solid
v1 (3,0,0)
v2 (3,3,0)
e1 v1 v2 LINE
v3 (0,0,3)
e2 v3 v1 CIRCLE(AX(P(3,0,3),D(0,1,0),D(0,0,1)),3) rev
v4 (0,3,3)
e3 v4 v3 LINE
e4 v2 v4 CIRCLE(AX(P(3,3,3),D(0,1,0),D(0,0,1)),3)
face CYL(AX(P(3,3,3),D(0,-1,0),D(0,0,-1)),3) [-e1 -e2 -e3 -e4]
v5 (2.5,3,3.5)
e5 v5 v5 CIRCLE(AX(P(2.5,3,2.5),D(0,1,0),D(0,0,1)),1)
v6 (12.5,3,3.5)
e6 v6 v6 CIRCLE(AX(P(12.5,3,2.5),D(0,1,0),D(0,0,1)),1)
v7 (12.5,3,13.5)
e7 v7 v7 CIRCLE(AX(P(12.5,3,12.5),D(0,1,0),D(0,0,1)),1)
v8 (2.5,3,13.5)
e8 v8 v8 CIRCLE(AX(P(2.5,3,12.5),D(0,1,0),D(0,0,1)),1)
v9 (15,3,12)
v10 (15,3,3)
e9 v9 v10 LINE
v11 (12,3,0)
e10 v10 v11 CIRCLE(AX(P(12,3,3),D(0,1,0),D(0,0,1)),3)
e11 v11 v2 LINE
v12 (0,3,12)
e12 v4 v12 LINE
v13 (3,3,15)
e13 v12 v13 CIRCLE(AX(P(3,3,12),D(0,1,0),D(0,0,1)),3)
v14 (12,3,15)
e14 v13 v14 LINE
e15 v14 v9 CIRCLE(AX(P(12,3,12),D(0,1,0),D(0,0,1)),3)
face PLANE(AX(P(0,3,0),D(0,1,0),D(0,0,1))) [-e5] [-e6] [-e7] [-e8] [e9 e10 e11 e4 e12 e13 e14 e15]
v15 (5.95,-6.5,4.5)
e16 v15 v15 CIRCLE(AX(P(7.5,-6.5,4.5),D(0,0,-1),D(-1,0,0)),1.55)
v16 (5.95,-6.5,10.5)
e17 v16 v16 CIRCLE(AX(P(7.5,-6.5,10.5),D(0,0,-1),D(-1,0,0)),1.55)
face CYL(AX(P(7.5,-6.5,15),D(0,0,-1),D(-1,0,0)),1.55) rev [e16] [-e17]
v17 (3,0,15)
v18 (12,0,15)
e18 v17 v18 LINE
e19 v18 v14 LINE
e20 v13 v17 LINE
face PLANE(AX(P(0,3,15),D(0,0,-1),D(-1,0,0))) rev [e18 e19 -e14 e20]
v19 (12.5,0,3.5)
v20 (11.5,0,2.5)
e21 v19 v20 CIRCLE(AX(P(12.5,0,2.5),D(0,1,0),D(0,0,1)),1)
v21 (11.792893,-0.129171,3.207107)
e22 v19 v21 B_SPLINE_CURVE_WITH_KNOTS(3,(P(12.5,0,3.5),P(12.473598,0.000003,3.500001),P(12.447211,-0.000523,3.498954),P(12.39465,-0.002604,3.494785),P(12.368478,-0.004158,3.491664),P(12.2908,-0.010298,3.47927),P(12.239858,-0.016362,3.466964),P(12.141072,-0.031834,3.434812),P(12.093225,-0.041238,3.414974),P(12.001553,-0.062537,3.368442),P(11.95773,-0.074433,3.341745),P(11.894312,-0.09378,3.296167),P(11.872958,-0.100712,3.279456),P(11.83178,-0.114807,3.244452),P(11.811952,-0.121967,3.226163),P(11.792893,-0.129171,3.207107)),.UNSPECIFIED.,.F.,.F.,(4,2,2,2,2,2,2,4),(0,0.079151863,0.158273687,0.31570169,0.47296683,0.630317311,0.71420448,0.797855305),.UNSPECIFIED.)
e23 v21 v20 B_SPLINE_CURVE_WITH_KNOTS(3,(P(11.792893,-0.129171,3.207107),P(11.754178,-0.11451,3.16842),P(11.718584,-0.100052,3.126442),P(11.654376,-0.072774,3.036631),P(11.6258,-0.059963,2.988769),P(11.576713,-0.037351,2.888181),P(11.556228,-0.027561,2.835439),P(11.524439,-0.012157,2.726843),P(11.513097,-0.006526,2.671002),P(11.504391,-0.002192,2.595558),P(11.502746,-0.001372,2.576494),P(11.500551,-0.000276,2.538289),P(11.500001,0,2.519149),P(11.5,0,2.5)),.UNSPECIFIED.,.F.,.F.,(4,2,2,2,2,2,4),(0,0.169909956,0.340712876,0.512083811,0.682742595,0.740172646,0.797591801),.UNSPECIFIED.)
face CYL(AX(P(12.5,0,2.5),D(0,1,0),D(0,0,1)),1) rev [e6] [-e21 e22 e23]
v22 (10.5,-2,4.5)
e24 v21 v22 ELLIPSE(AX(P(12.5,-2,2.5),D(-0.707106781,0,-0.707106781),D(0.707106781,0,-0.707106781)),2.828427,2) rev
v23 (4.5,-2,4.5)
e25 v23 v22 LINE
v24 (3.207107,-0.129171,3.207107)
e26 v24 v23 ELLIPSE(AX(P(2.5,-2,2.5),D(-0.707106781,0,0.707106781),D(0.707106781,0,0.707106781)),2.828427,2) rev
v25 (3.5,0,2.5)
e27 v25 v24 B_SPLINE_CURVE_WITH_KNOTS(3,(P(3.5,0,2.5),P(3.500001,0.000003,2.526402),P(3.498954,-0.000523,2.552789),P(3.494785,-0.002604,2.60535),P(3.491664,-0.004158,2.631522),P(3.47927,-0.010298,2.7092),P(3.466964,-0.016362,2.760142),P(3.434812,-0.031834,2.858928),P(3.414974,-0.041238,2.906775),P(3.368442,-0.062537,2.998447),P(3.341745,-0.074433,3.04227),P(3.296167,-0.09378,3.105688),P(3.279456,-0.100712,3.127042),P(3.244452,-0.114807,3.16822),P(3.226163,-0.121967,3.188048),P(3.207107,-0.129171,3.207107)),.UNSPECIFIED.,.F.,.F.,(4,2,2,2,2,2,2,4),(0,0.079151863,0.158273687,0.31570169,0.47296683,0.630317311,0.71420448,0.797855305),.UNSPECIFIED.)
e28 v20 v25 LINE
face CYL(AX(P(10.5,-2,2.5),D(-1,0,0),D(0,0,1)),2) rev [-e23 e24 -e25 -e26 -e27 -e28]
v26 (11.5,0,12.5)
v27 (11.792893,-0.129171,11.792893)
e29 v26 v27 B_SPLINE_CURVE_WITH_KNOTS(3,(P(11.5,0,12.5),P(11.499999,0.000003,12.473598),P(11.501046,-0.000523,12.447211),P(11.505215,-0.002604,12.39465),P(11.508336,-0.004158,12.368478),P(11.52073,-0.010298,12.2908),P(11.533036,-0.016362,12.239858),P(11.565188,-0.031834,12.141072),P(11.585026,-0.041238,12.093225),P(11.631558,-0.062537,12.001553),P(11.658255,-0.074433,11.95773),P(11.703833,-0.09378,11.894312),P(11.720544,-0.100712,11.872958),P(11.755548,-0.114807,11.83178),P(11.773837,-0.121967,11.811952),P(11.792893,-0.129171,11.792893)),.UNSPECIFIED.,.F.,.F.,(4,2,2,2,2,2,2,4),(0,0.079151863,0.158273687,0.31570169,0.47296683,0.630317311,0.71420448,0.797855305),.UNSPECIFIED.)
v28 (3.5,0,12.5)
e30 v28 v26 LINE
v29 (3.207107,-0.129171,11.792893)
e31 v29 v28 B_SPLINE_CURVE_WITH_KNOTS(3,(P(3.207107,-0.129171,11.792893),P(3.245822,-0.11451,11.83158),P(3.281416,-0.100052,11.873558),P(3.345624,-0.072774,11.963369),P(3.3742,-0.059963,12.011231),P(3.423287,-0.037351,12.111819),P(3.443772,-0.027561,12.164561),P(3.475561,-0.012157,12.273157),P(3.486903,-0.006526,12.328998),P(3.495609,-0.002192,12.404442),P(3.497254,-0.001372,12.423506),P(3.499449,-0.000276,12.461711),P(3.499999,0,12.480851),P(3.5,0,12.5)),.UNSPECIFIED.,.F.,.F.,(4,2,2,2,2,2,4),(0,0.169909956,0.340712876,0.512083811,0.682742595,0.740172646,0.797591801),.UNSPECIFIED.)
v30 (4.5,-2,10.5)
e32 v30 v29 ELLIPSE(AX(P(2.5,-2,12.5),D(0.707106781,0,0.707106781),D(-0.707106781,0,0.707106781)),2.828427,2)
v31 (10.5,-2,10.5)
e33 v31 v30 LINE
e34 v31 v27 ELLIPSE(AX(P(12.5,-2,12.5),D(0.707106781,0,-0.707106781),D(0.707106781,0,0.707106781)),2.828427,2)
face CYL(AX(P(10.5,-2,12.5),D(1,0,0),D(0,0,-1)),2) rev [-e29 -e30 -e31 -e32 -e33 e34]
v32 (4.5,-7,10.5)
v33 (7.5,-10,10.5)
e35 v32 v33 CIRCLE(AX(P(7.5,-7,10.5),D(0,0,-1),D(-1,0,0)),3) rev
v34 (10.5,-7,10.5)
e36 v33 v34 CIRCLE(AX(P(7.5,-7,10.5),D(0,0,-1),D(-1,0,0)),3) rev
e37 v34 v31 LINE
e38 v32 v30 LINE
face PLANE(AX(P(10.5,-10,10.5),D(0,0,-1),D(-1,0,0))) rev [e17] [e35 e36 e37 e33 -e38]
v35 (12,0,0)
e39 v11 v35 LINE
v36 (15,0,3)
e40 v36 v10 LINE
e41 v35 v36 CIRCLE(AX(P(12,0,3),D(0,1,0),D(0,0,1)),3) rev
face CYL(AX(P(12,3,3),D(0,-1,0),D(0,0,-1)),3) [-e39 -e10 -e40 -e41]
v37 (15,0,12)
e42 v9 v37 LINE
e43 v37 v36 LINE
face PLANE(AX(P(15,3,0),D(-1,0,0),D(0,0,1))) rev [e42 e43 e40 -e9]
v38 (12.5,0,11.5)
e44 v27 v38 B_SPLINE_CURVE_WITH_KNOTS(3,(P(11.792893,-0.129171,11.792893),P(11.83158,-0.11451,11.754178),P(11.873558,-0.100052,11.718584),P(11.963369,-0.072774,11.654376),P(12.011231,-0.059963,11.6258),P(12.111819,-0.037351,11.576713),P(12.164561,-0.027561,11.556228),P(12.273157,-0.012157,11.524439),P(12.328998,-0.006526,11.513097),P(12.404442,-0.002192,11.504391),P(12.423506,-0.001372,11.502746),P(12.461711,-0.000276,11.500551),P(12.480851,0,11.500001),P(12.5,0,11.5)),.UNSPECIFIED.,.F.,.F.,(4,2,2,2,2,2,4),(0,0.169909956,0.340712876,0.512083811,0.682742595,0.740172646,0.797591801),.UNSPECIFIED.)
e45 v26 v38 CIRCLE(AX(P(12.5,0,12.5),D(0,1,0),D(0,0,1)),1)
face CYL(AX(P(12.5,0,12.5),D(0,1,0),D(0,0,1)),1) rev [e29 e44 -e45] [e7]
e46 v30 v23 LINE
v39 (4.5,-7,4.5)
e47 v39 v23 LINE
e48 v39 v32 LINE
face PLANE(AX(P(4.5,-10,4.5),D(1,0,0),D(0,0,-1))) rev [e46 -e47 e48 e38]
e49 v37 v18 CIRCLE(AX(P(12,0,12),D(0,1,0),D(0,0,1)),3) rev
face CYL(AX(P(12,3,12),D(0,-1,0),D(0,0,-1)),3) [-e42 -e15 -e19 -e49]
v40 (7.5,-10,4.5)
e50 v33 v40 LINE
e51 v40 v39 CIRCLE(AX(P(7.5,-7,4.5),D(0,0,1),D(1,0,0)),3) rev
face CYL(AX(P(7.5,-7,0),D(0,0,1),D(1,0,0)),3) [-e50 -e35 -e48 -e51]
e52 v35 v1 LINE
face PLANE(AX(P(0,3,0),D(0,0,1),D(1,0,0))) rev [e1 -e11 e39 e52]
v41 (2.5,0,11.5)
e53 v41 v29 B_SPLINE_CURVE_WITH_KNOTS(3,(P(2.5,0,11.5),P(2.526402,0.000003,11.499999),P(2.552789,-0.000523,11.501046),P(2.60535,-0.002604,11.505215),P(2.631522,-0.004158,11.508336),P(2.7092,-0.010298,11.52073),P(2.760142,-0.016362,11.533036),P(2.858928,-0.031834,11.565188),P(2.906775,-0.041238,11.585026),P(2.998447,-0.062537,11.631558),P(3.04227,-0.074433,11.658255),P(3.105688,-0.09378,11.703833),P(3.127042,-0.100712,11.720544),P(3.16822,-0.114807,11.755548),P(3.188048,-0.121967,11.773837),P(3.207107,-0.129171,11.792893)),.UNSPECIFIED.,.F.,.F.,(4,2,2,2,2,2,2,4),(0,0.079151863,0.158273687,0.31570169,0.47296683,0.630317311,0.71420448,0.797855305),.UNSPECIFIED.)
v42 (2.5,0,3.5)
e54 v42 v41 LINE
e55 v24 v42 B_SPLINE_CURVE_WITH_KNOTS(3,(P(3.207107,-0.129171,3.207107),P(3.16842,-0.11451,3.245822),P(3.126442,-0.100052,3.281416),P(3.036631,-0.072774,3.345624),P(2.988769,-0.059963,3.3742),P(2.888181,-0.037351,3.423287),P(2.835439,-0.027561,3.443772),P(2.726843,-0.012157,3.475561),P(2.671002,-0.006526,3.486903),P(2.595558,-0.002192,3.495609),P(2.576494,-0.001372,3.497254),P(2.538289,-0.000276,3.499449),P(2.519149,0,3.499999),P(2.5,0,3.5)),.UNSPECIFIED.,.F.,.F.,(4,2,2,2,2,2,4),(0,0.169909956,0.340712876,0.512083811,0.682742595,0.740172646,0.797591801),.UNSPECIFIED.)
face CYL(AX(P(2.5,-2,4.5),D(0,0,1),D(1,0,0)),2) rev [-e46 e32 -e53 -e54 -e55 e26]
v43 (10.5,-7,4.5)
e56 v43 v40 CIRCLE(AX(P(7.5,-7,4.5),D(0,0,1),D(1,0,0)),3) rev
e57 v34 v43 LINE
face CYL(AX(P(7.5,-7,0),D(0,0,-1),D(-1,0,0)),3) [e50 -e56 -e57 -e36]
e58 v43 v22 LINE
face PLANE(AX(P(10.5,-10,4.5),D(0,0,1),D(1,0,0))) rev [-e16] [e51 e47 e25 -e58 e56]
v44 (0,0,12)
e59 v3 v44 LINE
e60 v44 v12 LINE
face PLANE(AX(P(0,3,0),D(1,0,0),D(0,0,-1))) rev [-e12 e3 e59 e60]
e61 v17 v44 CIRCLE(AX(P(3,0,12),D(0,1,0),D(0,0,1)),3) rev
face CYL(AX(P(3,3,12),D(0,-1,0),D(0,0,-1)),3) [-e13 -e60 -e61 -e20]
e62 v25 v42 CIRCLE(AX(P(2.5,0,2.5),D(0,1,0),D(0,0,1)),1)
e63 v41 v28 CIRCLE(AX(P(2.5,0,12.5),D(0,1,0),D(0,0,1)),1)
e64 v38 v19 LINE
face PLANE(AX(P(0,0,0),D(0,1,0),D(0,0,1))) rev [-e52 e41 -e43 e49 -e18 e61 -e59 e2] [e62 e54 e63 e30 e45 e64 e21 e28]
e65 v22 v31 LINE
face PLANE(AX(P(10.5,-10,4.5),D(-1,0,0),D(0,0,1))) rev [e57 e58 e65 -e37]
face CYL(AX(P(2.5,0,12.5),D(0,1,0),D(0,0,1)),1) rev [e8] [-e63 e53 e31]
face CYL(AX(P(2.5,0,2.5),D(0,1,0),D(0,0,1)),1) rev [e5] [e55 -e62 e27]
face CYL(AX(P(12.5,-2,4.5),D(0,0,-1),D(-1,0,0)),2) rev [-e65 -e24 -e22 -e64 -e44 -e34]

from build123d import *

# Parameters (mm, degrees)
SKETCH1_W           = 15
SKETCH1_H           = 15
BOSS_EXTRUDE1_DEPTH = 3
SKETCH3_R           = 1
CUT_EXTRUDE1_DEPTH  = 22.424285286
FILLET1_R           = 3
SKETCH4_W           = 6
SKETCH4_H           = 6
BOSS_EXTRUDE2_DEPTH = 10
SKETCH5_R           = 1.55
CUT_EXTRUDE2_DEPTH  = 21.862646045
FILLET2_R           = 3
FILLET3_R           = 2


# Some blends are built 0.0001 mm under size
with BuildPart() as part:
    # Sketch1 → Boss-Extrude1 (new body)
    with BuildSketch(Plane(origin=(0, 0, 0), x_dir=(1, 0, 0), z_dir=(0, 1, 0))):
        with Locations((7.5, -7.5)):
            Rectangle(SKETCH1_W, SKETCH1_H)
    extrude(amount=BOSS_EXTRUDE1_DEPTH)

    # Sketch3 → Cut-Extrude1 (cut, through all)
    with BuildSketch(Plane(origin=(0, 3, 0), x_dir=(1, 0, 0), z_dir=(0, 1, 0))):
        with Locations(Location((2.5, -12.5, 0), (0, 0, 270))):
            Circle(SKETCH3_R)
        with Locations(Location((12.5, -12.5, 0), (0, 0, 270))):
            Circle(SKETCH3_R)
        with Locations(Location((12.5, -2.5, 0), (0, 0, 270))):
            Circle(SKETCH3_R)
        with Locations(Location((2.5, -2.5, 0), (0, 0, 270))):
            Circle(SKETCH3_R)
    extrude(amount=-CUT_EXTRUDE1_DEPTH, mode=Mode.SUBTRACT)

    # Fillet1
    fillet1_edges = [part.edges().sort_by_distance(p)[0] for p in [
        (0, 1.5, 0),
        (15, 1.5, 0),
        (15, 1.5, 15),
        (0, 1.5, 15),
    ]]
    fillet(fillet1_edges, radius=FILLET1_R)

    # Sketch4 → Boss-Extrude2 (add)
    with BuildSketch(Plane(origin=(0, 0, 0), x_dir=(-1, 0, 0), z_dir=(0, -1, 0))):
        with Locations((-7.5, -7.5)):
            Rectangle(SKETCH4_W, SKETCH4_H)
    extrude(amount=BOSS_EXTRUDE2_DEPTH)

    # Sketch5 → Cut-Extrude2 (cut, through all)
    with BuildSketch(Plane(origin=(0, 0, 4.5), x_dir=(-1, 0, 0), z_dir=(0, 0, -1))):
        with Locations((-7.5, -6.5)):
            Circle(SKETCH5_R)
    extrude(amount=-CUT_EXTRUDE2_DEPTH, mode=Mode.SUBTRACT)

    # Fillet2
    fillet2_edges = [part.edges().sort_by_distance(p)[0] for p in [
        (10.5, -10, 7.5),
        (4.5, -10, 7.5),
    ]]
    fillet(fillet2_edges, radius=FILLET2_R - 0.0001)  # a hair under: the kernel refuses the full size

    # Fillet3
    # the kernel refuses this fillet: 2 mm, written as the material it adds along each edge
    with BuildSketch(Plane(origin=(10.5, 0, 10.5), x_dir=(0, -1, 0), z_dir=(0, 0, -1)), Plane(origin=(4.5, 0, 10.5), x_dir=(0, -1, 0), z_dir=(1, 0, 0))) as fillet3_piece_1:
        with BuildLine():
            CenterArc((FILLET3_R, -FILLET3_R), FILLET3_R, 90, 90)
            Line((0, -FILLET3_R), (0, 0))
            Line((0, 0), (FILLET3_R, 0))
        make_face()
    extrude(amount=6)
    with BuildSketch(Plane(origin=(4.5, 0, 4.5), x_dir=(-1, 0, 0), z_dir=(0, 0, 1)), Plane(origin=(10.5, 0, 4.5), x_dir=(0, 0, -1), z_dir=(-1, 0, 0))) as fillet3_piece_2:
        with BuildLine():
            CenterArc((FILLET3_R, FILLET3_R), FILLET3_R, 180, 90)
            Line((0, FILLET3_R), (0, 0))
            Line((0, 0), (FILLET3_R, 0))
        make_face()
    extrude(amount=6)
    with BuildSketch(Plane(origin=(10.5, 0, 15.5), x_dir=(0, -1, 0), z_dir=(0, 0, -1))) as fillet3_piece_3a_section:
        with BuildLine():
            CenterArc((FILLET3_R, -FILLET3_R), FILLET3_R, 90, 90)
            Line((0, -FILLET3_R), (0, 0))
            Line((0, 0), (FILLET3_R, 0))
        make_face()
    fillet3_piece_3a = extrude(amount=11, mode=Mode.PRIVATE)
    fillet3_piece_3a = split(fillet3_piece_3a, bisect_by=Plane(origin=(10.928031961, -0.460476413, 10.5), z_dir=(0, 0, 1)), keep=Keep.TOP, mode=Mode.PRIVATE)
    fillet3_piece_3a = fillet3_piece_3a & Plane(origin=(12, -0.460476413, 12), x_dir=(1, 0, 0), z_dir=(0, 1, 0)) * Cylinder(3, 30, mode=Mode.PRIVATE)
    fillet3_piece_3a = fillet3_piece_3a - Plane(origin=(12.5, -0.460476413, 12.5), x_dir=(0, 0, 1), z_dir=(0, 1, 0)) * Cylinder(1, 30, mode=Mode.PRIVATE)
    with BuildSketch(Plane(origin=(4.5, 0, 10.5), x_dir=(0, -1, 0), z_dir=(1, 0, 0))) as fillet3_piece_3b_section:
        with BuildLine():
            CenterArc((FILLET3_R, -FILLET3_R), FILLET3_R, 90, 90)
            Line((0, -FILLET3_R), (0, 0))
            Line((0, 0), (FILLET3_R, 0))
        make_face()
    fillet3_piece_3b = extrude(amount=11, mode=Mode.PRIVATE)
    fillet3_piece_3b = split(fillet3_piece_3b, bisect_by=Plane(origin=(10.5, -0.460476368, 10.928032026), z_dir=(1, 0, 0)), keep=Keep.TOP, mode=Mode.PRIVATE)
    fillet3_piece_3b = fillet3_piece_3b & Plane(origin=(12, -0.460476368, 12), x_dir=(1, 0, 0), z_dir=(0, 1, 0)) * Cylinder(3, 31, mode=Mode.PRIVATE)
    fillet3_piece_3b = fillet3_piece_3b - Plane(origin=(12.5, -0.460476368, 12.5), x_dir=(0, 0, 1), z_dir=(0, 1, 0)) * Cylinder(1, 31, mode=Mode.PRIVATE)
    fillet3_piece_3 = fillet3_piece_3a & fillet3_piece_3b
    add(fillet3_piece_3)
    with BuildSketch(Plane(origin=(10.5, 0, 10.5), x_dir=(0, -1, 0), z_dir=(0, 0, -1))) as fillet3_piece_4a_section:
        with BuildLine():
            CenterArc((FILLET3_R, -FILLET3_R), FILLET3_R, 90, 90)
            Line((0, -FILLET3_R), (0, 0))
            Line((0, 0), (FILLET3_R, 0))
        make_face()
    fillet3_piece_4a = extrude(amount=11, mode=Mode.PRIVATE)
    fillet3_piece_4a = split(fillet3_piece_4a, bisect_by=Plane(origin=(10.928032026, -0.460476368, 4.5), z_dir=(0, 0, -1)), keep=Keep.TOP, mode=Mode.PRIVATE)
    fillet3_piece_4a = fillet3_piece_4a & Plane(origin=(12, -0.460476368, 3), x_dir=(0, 0, -1), z_dir=(0, 1, 0)) * Cylinder(3, 30, mode=Mode.PRIVATE)
    fillet3_piece_4a = fillet3_piece_4a - Plane(origin=(12.5, -0.460476368, 2.5), x_dir=(0, 0, 1), z_dir=(0, 1, 0)) * Cylinder(1, 30, mode=Mode.PRIVATE)
    with BuildSketch(Plane(origin=(15.5, 0, 4.5), x_dir=(0, 0, -1), z_dir=(-1, 0, 0))) as fillet3_piece_4b_section:
        with BuildLine():
            CenterArc((FILLET3_R, FILLET3_R), FILLET3_R, 180, 90)
            Line((0, FILLET3_R), (0, 0))
            Line((0, 0), (FILLET3_R, 0))
        make_face()
    fillet3_piece_4b = extrude(amount=11, mode=Mode.PRIVATE)
    fillet3_piece_4b = split(fillet3_piece_4b, bisect_by=Plane(origin=(10.5, -0.460476818, 4.071968325), z_dir=(1, 0, 0)), keep=Keep.TOP, mode=Mode.PRIVATE)
    fillet3_piece_4b = fillet3_piece_4b & Plane(origin=(12, -0.460476818, 3), x_dir=(0, 0, -1), z_dir=(0, 1, 0)) * Cylinder(3, 30, mode=Mode.PRIVATE)
    fillet3_piece_4b = fillet3_piece_4b - Plane(origin=(12.5, -0.460476818, 2.5), x_dir=(0, 0, 1), z_dir=(0, 1, 0)) * Cylinder(1, 30, mode=Mode.PRIVATE)
    fillet3_piece_4 = fillet3_piece_4a & fillet3_piece_4b
    add(fillet3_piece_4)
    with BuildSketch(Plane(origin=(-0.5, 0, 10.5), x_dir=(0, -1, 0), z_dir=(1, 0, 0))) as fillet3_piece_5a_section:
        with BuildLine():
            CenterArc((FILLET3_R, -FILLET3_R), FILLET3_R, 90, 90)
            Line((0, -FILLET3_R), (0, 0))
            Line((0, 0), (FILLET3_R, 0))
        make_face()
    fillet3_piece_5a = extrude(amount=11, mode=Mode.PRIVATE)
    fillet3_piece_5a = split(fillet3_piece_5a, bisect_by=Plane(origin=(4.5, -0.460476374, 10.928031998), z_dir=(-1, 0, 0)), keep=Keep.TOP, mode=Mode.PRIVATE)
    fillet3_piece_5a = fillet3_piece_5a & Plane(origin=(3, -0.460476374, 12), x_dir=(-1, 0, 0), z_dir=(0, 1, 0)) * Cylinder(3, 30, mode=Mode.PRIVATE)
    fillet3_piece_5a = fillet3_piece_5a - Plane(origin=(2.5, -0.460476374, 12.5), x_dir=(0, 0, 1), z_dir=(0, 1, 0)) * Cylinder(1, 30, mode=Mode.PRIVATE)
    with BuildSketch(Plane(origin=(4.5, 0, 4.5), x_dir=(-1, 0, 0), z_dir=(0, 0, 1))) as fillet3_piece_5b_section:
        with BuildLine():
            CenterArc((FILLET3_R, FILLET3_R), FILLET3_R, 180, 90)
            Line((0, FILLET3_R), (0, 0))
            Line((0, 0), (FILLET3_R, 0))
        make_face()
    fillet3_piece_5b = extrude(amount=11, mode=Mode.PRIVATE)
    fillet3_piece_5b = split(fillet3_piece_5b, bisect_by=Plane(origin=(4.071967841, -0.460476686, 10.5), z_dir=(0, 0, 1)), keep=Keep.TOP, mode=Mode.PRIVATE)
    fillet3_piece_5b = fillet3_piece_5b & Plane(origin=(3, -0.460476686, 12), x_dir=(-1, 0, 0), z_dir=(0, 1, 0)) * Cylinder(3, 30, mode=Mode.PRIVATE)
    fillet3_piece_5b = fillet3_piece_5b - Plane(origin=(2.5, -0.460476686, 12.5), x_dir=(0, 0, 1), z_dir=(0, 1, 0)) * Cylinder(1, 30, mode=Mode.PRIVATE)
    fillet3_piece_5 = fillet3_piece_5a & fillet3_piece_5b
    add(fillet3_piece_5)
    with BuildSketch(Plane(origin=(4.5, 0, -0.5), x_dir=(-1, 0, 0), z_dir=(0, 0, 1))) as fillet3_piece_6a_section:
        with BuildLine():
            CenterArc((FILLET3_R, FILLET3_R), FILLET3_R, 180, 90)
            Line((0, FILLET3_R), (0, 0))
            Line((0, 0), (FILLET3_R, 0))
        make_face()
    fillet3_piece_6a = extrude(amount=11, mode=Mode.PRIVATE)
    fillet3_piece_6a = fillet3_piece_6a & Plane(origin=(3, -0.460476683, 3), x_dir=(0, 0, -1), z_dir=(0, 1, 0)) * Cylinder(3, 30, mode=Mode.PRIVATE)
    fillet3_piece_6a = fillet3_piece_6a - Plane(origin=(2.5, -0.460476683, 2.5), x_dir=(0, 0, 1), z_dir=(0, 1, 0)) * Cylinder(1, 30, mode=Mode.PRIVATE)
    fillet3_piece_6a = split(fillet3_piece_6a, bisect_by=Plane(origin=(4.071967813, -0.460476683, 4.5), z_dir=(0, 0, -1)), keep=Keep.TOP, mode=Mode.PRIVATE)
    with BuildSketch(Plane(origin=(10.5, 0, 4.5), x_dir=(0, 0, -1), z_dir=(-1, 0, 0))) as fillet3_piece_6b_section:
        with BuildLine():
            CenterArc((FILLET3_R, FILLET3_R), FILLET3_R, 180, 90)
            Line((0, FILLET3_R), (0, 0))
            Line((0, 0), (FILLET3_R, 0))
        make_face()
    fillet3_piece_6b = extrude(amount=11, mode=Mode.PRIVATE)
    fillet3_piece_6b = fillet3_piece_6b & Plane(origin=(3, -0.460476796, 3), x_dir=(0, 0, -1), z_dir=(0, 1, 0)) * Cylinder(3, 30, mode=Mode.PRIVATE)
    fillet3_piece_6b = fillet3_piece_6b - Plane(origin=(2.5, -0.460476796, 2.5), x_dir=(0, 0, 1), z_dir=(0, 1, 0)) * Cylinder(1, 30, mode=Mode.PRIVATE)
    fillet3_piece_6b = split(fillet3_piece_6b, bisect_by=Plane(origin=(4.5, -0.460476796, 4.071968238), z_dir=(-1, 0, 0)), keep=Keep.TOP, mode=Mode.PRIVATE)
    fillet3_piece_6 = fillet3_piece_6a & fillet3_piece_6b
    add(fillet3_piece_6)


solid = part.part
